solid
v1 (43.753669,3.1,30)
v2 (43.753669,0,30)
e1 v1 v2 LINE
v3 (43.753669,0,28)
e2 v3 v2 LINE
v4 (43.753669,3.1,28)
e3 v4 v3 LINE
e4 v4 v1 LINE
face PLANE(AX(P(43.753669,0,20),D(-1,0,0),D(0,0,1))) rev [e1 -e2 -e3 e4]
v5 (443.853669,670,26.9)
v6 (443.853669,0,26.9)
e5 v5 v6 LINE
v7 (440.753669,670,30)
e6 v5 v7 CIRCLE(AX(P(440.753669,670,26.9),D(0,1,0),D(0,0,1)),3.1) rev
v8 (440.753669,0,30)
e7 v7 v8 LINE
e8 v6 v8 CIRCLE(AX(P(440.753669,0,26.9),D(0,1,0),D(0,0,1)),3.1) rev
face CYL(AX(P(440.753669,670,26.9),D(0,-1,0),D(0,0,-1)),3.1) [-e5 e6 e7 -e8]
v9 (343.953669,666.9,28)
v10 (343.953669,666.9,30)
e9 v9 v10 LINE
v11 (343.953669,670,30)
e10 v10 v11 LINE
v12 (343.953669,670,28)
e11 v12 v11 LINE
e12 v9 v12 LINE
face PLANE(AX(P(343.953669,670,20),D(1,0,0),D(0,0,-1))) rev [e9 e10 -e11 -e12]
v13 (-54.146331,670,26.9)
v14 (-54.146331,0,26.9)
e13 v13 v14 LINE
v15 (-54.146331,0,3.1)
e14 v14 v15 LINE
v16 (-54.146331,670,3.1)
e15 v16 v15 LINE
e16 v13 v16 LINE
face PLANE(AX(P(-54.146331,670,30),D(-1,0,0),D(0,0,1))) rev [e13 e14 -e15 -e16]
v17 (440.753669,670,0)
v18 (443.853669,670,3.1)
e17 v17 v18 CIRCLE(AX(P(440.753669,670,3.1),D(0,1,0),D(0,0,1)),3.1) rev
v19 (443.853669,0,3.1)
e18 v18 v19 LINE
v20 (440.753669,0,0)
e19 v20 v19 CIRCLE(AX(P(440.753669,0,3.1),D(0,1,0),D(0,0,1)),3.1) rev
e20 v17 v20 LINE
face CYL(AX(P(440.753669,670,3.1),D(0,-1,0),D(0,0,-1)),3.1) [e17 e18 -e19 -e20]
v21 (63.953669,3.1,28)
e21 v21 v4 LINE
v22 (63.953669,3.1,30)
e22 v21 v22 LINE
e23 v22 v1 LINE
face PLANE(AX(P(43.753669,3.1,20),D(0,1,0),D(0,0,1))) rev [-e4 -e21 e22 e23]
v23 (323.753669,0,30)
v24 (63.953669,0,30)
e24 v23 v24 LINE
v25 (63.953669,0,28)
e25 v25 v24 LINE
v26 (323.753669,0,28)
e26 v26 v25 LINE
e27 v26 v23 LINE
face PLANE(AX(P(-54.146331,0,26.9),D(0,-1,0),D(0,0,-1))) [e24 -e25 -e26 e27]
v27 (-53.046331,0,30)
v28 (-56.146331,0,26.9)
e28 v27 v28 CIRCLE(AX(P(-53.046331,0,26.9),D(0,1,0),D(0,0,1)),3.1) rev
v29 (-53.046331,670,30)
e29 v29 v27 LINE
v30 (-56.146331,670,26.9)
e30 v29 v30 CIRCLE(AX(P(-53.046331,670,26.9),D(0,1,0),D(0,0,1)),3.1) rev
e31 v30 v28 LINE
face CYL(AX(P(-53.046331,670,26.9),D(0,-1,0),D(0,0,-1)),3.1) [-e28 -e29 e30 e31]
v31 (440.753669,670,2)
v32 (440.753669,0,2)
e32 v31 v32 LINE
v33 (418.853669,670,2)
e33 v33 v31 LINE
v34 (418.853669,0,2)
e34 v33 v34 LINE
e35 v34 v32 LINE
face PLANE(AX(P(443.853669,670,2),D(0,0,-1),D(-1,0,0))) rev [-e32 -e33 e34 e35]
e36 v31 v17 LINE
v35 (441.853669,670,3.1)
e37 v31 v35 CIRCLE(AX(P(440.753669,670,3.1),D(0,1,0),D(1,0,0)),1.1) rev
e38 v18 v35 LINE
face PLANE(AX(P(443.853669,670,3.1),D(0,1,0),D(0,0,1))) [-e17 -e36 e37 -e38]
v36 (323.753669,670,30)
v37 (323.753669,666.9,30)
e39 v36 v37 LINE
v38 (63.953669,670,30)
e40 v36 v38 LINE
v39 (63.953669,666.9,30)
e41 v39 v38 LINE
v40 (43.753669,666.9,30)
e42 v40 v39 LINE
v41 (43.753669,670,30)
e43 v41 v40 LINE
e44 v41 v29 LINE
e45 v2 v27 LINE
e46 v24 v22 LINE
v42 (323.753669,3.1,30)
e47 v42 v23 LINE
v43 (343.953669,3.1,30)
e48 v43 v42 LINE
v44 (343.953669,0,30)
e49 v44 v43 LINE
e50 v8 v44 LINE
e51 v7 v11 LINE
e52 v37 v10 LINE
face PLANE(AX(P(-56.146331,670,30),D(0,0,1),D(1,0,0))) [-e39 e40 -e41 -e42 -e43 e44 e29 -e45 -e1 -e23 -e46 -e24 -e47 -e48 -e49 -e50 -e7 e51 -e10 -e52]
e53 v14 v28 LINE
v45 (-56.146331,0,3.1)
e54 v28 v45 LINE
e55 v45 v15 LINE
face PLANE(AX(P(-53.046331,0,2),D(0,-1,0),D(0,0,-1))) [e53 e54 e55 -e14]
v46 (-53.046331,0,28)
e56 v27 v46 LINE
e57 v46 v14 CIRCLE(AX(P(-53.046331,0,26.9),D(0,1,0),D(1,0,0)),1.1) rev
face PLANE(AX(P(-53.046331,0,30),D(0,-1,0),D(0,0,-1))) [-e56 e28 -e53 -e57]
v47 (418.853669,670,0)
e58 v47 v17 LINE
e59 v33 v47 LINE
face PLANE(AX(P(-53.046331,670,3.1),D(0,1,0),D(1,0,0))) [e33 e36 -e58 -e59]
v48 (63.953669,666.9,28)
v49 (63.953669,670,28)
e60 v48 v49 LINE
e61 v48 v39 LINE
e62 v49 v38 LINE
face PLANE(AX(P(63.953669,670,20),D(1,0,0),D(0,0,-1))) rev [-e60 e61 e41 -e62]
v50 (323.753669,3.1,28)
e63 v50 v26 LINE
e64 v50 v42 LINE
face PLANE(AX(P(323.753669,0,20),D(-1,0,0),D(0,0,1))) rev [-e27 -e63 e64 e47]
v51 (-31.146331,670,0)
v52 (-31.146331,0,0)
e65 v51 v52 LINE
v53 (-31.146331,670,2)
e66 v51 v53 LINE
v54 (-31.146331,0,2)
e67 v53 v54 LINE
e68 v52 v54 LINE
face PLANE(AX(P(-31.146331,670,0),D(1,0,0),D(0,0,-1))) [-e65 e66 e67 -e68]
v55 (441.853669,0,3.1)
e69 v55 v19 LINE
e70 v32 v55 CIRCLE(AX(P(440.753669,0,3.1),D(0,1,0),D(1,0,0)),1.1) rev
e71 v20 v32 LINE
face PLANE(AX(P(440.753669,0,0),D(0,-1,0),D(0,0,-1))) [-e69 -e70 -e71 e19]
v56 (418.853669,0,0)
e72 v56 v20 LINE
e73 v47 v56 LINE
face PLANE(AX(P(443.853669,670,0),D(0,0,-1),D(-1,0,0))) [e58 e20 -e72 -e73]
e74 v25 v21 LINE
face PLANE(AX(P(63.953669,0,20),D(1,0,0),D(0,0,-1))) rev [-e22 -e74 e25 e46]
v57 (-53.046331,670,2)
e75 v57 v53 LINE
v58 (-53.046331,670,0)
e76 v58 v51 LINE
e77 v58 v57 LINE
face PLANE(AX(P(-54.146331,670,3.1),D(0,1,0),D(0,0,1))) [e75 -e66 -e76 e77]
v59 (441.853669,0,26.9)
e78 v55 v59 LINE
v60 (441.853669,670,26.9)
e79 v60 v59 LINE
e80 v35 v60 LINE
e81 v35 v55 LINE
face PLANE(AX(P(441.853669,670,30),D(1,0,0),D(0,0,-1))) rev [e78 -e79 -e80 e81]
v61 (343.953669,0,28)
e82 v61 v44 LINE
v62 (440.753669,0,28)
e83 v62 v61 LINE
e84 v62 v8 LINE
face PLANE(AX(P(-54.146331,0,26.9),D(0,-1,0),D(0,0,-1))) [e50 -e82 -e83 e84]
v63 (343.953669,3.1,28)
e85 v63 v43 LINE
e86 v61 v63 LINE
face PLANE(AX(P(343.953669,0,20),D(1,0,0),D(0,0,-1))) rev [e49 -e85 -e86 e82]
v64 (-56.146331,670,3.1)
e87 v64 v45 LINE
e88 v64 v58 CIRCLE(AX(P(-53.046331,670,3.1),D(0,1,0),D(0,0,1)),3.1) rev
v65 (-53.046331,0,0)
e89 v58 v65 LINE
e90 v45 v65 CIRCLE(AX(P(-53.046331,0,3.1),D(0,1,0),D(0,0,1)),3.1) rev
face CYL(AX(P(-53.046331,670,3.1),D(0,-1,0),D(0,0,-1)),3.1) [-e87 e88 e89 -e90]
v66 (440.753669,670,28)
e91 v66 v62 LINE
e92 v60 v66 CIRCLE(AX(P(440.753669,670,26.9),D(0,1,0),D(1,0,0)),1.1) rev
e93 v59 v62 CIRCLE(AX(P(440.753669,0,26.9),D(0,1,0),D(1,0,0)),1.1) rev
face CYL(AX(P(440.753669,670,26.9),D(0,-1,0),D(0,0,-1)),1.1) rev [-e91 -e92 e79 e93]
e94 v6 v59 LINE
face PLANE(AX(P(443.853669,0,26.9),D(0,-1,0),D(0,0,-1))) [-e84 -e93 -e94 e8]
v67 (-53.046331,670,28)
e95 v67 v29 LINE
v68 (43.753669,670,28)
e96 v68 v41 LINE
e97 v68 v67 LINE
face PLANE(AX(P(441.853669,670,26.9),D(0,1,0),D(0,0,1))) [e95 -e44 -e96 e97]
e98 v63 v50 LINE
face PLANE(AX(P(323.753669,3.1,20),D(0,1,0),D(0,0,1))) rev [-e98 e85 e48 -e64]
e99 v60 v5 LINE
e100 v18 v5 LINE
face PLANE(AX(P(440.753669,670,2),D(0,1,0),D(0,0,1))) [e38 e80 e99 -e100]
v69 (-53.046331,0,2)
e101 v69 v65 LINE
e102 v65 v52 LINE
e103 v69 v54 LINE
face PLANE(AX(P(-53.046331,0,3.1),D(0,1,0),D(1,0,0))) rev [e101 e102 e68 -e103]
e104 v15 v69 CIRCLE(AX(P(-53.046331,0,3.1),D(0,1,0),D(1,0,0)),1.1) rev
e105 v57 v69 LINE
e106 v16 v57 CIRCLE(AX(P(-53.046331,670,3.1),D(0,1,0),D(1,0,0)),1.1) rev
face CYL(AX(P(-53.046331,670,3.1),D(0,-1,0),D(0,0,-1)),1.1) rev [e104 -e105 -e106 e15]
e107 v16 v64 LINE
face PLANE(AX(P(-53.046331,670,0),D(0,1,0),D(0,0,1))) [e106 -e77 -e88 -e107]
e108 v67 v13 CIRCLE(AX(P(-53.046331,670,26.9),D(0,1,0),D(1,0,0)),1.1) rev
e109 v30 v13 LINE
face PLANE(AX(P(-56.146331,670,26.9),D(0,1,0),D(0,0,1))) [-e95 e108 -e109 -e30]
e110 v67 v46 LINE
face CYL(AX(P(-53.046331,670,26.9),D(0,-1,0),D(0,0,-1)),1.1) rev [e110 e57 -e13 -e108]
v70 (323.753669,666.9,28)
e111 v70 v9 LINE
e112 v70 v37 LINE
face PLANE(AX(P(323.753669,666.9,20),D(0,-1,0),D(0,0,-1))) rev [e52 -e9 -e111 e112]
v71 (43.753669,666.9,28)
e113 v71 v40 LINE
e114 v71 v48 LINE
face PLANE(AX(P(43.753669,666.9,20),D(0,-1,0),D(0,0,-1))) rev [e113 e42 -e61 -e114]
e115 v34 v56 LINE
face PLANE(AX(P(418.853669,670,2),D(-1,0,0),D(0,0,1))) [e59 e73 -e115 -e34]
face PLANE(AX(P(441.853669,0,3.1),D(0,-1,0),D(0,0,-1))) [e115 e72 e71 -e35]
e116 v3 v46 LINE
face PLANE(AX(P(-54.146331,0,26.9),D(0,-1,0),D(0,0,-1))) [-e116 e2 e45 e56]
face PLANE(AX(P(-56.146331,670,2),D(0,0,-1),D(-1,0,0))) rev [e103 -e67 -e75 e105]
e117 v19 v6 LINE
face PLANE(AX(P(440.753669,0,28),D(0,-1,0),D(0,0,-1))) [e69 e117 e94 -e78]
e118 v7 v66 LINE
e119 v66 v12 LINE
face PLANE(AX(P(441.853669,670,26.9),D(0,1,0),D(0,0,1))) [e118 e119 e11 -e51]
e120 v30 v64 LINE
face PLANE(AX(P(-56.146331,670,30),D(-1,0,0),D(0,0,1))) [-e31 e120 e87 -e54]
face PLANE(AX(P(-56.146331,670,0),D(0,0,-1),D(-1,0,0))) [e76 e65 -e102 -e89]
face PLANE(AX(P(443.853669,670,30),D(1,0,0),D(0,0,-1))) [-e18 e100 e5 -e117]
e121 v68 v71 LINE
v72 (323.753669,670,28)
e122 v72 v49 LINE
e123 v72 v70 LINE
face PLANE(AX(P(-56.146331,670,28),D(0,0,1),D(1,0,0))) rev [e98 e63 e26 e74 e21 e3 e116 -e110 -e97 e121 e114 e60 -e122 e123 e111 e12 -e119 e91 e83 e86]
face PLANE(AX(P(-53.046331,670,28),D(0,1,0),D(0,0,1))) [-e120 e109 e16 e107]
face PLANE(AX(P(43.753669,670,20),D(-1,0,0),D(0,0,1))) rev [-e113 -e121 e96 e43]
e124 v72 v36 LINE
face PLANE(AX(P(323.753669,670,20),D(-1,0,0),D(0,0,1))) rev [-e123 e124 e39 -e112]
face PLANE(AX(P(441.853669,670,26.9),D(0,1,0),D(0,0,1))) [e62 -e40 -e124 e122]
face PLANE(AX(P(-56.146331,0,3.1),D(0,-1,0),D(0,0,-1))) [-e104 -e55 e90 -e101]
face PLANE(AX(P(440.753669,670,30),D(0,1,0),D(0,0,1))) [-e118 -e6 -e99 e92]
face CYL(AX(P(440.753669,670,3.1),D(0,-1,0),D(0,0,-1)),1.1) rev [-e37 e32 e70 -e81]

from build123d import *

# Parameters (mm, degrees)
SM_BASE_FLANGE_1_DEPTH = 670
SKETCH_2_W             = 20.2
SKETCH_2_H             = 3.1
CUT_EXTRUDE_1_DEPTH    = 10
SKETCH_4_W             = 20.2
SKETCH_4_H             = 3.1
CUT_EXTRUDE_3_DEPTH    = 10


# Sheet-metal steps are written as plain solids
with BuildPart() as part:
    # Sketch 1 → Базовая кромка1 (new body)
    with BuildSketch(Plane(origin=(0, 0, 0), x_dir=(1, 0, 0), z_dir=(0, 1, 0))):
        with BuildLine():
            Line((-31.146330545, 0), (-53.046330545, 0))
            ThreePointArc((-53.046330545, 0), (-55.238361567, -0.907968978), (-56.146330545, -3.1))
            Line((-56.146330545, -3.1), (-56.146330545, -26.9))
            ThreePointArc((-56.146330545, -26.9), (-55.238361567, -29.092031022), (-53.046330545, -30))
            Line((-53.046330545, -30), (440.753669455, -30))
            ThreePointArc((440.753669455, -30), (442.945700477, -29.092031022), (443.853669455, -26.9))
            Line((443.853669455, -26.9), (443.853669455, -3.1))
            ThreePointArc((443.853669455, -3.1), (442.945700477, -0.907968978), (440.753669455, 0))
            Line((440.753669455, 0), (418.853669455, 0))
            Line((418.853669455, 0), (418.853669455, -2))
            Line((418.853669455, -2), (440.753669455, -2))
            ThreePointArc((440.753669455, -2), (441.531486914, -2.322182541), (441.853669455, -3.1))
            Line((441.853669455, -3.1), (441.853669455, -26.9))
            ThreePointArc((441.853669455, -26.9), (441.531486914, -27.677817459), (440.753669455, -28))
            Line((440.753669455, -28), (-53.046330545, -28))
            ThreePointArc((-53.046330545, -28), (-53.824148004, -27.677817459), (-54.146330545, -26.9))
            Line((-54.146330545, -26.9), (-54.146330545, -3.1))
            ThreePointArc((-54.146330545, -3.1), (-53.824148004, -2.322182541), (-53.046330545, -2))
            Line((-53.046330545, -2), (-31.146330545, -2))
            Line((-31.146330545, -2), (-31.146330545, 0))
        make_face()
    extrude(amount=SM_BASE_FLANGE_1_DEPTH)

    # Эскиз2 → Вырез-Вытянуть1 (cut)
    with BuildSketch(Plane.XY.offset(30)):
        with Locations((53.853669455, 1.55)):
            Rectangle(SKETCH_2_W, SKETCH_2_H)
        with Locations((333.853669455, 1.55)):
            Rectangle(SKETCH_2_W, SKETCH_2_H)
    extrude(amount=-CUT_EXTRUDE_1_DEPTH, mode=Mode.SUBTRACT)

    # Эскиз4 → Вырез-Вытянуть3 (cut)
    with BuildSketch(Plane.XY.offset(30)):
        with Locations((53.853669455, 668.45)):
            Rectangle(SKETCH_4_W, SKETCH_4_H)
        with Locations((333.853669455, 668.45)):
            Rectangle(SKETCH_4_W, SKETCH_4_H)
    extrude(amount=-CUT_EXTRUDE_3_DEPTH, mode=Mode.SUBTRACT)


solid = part.part
